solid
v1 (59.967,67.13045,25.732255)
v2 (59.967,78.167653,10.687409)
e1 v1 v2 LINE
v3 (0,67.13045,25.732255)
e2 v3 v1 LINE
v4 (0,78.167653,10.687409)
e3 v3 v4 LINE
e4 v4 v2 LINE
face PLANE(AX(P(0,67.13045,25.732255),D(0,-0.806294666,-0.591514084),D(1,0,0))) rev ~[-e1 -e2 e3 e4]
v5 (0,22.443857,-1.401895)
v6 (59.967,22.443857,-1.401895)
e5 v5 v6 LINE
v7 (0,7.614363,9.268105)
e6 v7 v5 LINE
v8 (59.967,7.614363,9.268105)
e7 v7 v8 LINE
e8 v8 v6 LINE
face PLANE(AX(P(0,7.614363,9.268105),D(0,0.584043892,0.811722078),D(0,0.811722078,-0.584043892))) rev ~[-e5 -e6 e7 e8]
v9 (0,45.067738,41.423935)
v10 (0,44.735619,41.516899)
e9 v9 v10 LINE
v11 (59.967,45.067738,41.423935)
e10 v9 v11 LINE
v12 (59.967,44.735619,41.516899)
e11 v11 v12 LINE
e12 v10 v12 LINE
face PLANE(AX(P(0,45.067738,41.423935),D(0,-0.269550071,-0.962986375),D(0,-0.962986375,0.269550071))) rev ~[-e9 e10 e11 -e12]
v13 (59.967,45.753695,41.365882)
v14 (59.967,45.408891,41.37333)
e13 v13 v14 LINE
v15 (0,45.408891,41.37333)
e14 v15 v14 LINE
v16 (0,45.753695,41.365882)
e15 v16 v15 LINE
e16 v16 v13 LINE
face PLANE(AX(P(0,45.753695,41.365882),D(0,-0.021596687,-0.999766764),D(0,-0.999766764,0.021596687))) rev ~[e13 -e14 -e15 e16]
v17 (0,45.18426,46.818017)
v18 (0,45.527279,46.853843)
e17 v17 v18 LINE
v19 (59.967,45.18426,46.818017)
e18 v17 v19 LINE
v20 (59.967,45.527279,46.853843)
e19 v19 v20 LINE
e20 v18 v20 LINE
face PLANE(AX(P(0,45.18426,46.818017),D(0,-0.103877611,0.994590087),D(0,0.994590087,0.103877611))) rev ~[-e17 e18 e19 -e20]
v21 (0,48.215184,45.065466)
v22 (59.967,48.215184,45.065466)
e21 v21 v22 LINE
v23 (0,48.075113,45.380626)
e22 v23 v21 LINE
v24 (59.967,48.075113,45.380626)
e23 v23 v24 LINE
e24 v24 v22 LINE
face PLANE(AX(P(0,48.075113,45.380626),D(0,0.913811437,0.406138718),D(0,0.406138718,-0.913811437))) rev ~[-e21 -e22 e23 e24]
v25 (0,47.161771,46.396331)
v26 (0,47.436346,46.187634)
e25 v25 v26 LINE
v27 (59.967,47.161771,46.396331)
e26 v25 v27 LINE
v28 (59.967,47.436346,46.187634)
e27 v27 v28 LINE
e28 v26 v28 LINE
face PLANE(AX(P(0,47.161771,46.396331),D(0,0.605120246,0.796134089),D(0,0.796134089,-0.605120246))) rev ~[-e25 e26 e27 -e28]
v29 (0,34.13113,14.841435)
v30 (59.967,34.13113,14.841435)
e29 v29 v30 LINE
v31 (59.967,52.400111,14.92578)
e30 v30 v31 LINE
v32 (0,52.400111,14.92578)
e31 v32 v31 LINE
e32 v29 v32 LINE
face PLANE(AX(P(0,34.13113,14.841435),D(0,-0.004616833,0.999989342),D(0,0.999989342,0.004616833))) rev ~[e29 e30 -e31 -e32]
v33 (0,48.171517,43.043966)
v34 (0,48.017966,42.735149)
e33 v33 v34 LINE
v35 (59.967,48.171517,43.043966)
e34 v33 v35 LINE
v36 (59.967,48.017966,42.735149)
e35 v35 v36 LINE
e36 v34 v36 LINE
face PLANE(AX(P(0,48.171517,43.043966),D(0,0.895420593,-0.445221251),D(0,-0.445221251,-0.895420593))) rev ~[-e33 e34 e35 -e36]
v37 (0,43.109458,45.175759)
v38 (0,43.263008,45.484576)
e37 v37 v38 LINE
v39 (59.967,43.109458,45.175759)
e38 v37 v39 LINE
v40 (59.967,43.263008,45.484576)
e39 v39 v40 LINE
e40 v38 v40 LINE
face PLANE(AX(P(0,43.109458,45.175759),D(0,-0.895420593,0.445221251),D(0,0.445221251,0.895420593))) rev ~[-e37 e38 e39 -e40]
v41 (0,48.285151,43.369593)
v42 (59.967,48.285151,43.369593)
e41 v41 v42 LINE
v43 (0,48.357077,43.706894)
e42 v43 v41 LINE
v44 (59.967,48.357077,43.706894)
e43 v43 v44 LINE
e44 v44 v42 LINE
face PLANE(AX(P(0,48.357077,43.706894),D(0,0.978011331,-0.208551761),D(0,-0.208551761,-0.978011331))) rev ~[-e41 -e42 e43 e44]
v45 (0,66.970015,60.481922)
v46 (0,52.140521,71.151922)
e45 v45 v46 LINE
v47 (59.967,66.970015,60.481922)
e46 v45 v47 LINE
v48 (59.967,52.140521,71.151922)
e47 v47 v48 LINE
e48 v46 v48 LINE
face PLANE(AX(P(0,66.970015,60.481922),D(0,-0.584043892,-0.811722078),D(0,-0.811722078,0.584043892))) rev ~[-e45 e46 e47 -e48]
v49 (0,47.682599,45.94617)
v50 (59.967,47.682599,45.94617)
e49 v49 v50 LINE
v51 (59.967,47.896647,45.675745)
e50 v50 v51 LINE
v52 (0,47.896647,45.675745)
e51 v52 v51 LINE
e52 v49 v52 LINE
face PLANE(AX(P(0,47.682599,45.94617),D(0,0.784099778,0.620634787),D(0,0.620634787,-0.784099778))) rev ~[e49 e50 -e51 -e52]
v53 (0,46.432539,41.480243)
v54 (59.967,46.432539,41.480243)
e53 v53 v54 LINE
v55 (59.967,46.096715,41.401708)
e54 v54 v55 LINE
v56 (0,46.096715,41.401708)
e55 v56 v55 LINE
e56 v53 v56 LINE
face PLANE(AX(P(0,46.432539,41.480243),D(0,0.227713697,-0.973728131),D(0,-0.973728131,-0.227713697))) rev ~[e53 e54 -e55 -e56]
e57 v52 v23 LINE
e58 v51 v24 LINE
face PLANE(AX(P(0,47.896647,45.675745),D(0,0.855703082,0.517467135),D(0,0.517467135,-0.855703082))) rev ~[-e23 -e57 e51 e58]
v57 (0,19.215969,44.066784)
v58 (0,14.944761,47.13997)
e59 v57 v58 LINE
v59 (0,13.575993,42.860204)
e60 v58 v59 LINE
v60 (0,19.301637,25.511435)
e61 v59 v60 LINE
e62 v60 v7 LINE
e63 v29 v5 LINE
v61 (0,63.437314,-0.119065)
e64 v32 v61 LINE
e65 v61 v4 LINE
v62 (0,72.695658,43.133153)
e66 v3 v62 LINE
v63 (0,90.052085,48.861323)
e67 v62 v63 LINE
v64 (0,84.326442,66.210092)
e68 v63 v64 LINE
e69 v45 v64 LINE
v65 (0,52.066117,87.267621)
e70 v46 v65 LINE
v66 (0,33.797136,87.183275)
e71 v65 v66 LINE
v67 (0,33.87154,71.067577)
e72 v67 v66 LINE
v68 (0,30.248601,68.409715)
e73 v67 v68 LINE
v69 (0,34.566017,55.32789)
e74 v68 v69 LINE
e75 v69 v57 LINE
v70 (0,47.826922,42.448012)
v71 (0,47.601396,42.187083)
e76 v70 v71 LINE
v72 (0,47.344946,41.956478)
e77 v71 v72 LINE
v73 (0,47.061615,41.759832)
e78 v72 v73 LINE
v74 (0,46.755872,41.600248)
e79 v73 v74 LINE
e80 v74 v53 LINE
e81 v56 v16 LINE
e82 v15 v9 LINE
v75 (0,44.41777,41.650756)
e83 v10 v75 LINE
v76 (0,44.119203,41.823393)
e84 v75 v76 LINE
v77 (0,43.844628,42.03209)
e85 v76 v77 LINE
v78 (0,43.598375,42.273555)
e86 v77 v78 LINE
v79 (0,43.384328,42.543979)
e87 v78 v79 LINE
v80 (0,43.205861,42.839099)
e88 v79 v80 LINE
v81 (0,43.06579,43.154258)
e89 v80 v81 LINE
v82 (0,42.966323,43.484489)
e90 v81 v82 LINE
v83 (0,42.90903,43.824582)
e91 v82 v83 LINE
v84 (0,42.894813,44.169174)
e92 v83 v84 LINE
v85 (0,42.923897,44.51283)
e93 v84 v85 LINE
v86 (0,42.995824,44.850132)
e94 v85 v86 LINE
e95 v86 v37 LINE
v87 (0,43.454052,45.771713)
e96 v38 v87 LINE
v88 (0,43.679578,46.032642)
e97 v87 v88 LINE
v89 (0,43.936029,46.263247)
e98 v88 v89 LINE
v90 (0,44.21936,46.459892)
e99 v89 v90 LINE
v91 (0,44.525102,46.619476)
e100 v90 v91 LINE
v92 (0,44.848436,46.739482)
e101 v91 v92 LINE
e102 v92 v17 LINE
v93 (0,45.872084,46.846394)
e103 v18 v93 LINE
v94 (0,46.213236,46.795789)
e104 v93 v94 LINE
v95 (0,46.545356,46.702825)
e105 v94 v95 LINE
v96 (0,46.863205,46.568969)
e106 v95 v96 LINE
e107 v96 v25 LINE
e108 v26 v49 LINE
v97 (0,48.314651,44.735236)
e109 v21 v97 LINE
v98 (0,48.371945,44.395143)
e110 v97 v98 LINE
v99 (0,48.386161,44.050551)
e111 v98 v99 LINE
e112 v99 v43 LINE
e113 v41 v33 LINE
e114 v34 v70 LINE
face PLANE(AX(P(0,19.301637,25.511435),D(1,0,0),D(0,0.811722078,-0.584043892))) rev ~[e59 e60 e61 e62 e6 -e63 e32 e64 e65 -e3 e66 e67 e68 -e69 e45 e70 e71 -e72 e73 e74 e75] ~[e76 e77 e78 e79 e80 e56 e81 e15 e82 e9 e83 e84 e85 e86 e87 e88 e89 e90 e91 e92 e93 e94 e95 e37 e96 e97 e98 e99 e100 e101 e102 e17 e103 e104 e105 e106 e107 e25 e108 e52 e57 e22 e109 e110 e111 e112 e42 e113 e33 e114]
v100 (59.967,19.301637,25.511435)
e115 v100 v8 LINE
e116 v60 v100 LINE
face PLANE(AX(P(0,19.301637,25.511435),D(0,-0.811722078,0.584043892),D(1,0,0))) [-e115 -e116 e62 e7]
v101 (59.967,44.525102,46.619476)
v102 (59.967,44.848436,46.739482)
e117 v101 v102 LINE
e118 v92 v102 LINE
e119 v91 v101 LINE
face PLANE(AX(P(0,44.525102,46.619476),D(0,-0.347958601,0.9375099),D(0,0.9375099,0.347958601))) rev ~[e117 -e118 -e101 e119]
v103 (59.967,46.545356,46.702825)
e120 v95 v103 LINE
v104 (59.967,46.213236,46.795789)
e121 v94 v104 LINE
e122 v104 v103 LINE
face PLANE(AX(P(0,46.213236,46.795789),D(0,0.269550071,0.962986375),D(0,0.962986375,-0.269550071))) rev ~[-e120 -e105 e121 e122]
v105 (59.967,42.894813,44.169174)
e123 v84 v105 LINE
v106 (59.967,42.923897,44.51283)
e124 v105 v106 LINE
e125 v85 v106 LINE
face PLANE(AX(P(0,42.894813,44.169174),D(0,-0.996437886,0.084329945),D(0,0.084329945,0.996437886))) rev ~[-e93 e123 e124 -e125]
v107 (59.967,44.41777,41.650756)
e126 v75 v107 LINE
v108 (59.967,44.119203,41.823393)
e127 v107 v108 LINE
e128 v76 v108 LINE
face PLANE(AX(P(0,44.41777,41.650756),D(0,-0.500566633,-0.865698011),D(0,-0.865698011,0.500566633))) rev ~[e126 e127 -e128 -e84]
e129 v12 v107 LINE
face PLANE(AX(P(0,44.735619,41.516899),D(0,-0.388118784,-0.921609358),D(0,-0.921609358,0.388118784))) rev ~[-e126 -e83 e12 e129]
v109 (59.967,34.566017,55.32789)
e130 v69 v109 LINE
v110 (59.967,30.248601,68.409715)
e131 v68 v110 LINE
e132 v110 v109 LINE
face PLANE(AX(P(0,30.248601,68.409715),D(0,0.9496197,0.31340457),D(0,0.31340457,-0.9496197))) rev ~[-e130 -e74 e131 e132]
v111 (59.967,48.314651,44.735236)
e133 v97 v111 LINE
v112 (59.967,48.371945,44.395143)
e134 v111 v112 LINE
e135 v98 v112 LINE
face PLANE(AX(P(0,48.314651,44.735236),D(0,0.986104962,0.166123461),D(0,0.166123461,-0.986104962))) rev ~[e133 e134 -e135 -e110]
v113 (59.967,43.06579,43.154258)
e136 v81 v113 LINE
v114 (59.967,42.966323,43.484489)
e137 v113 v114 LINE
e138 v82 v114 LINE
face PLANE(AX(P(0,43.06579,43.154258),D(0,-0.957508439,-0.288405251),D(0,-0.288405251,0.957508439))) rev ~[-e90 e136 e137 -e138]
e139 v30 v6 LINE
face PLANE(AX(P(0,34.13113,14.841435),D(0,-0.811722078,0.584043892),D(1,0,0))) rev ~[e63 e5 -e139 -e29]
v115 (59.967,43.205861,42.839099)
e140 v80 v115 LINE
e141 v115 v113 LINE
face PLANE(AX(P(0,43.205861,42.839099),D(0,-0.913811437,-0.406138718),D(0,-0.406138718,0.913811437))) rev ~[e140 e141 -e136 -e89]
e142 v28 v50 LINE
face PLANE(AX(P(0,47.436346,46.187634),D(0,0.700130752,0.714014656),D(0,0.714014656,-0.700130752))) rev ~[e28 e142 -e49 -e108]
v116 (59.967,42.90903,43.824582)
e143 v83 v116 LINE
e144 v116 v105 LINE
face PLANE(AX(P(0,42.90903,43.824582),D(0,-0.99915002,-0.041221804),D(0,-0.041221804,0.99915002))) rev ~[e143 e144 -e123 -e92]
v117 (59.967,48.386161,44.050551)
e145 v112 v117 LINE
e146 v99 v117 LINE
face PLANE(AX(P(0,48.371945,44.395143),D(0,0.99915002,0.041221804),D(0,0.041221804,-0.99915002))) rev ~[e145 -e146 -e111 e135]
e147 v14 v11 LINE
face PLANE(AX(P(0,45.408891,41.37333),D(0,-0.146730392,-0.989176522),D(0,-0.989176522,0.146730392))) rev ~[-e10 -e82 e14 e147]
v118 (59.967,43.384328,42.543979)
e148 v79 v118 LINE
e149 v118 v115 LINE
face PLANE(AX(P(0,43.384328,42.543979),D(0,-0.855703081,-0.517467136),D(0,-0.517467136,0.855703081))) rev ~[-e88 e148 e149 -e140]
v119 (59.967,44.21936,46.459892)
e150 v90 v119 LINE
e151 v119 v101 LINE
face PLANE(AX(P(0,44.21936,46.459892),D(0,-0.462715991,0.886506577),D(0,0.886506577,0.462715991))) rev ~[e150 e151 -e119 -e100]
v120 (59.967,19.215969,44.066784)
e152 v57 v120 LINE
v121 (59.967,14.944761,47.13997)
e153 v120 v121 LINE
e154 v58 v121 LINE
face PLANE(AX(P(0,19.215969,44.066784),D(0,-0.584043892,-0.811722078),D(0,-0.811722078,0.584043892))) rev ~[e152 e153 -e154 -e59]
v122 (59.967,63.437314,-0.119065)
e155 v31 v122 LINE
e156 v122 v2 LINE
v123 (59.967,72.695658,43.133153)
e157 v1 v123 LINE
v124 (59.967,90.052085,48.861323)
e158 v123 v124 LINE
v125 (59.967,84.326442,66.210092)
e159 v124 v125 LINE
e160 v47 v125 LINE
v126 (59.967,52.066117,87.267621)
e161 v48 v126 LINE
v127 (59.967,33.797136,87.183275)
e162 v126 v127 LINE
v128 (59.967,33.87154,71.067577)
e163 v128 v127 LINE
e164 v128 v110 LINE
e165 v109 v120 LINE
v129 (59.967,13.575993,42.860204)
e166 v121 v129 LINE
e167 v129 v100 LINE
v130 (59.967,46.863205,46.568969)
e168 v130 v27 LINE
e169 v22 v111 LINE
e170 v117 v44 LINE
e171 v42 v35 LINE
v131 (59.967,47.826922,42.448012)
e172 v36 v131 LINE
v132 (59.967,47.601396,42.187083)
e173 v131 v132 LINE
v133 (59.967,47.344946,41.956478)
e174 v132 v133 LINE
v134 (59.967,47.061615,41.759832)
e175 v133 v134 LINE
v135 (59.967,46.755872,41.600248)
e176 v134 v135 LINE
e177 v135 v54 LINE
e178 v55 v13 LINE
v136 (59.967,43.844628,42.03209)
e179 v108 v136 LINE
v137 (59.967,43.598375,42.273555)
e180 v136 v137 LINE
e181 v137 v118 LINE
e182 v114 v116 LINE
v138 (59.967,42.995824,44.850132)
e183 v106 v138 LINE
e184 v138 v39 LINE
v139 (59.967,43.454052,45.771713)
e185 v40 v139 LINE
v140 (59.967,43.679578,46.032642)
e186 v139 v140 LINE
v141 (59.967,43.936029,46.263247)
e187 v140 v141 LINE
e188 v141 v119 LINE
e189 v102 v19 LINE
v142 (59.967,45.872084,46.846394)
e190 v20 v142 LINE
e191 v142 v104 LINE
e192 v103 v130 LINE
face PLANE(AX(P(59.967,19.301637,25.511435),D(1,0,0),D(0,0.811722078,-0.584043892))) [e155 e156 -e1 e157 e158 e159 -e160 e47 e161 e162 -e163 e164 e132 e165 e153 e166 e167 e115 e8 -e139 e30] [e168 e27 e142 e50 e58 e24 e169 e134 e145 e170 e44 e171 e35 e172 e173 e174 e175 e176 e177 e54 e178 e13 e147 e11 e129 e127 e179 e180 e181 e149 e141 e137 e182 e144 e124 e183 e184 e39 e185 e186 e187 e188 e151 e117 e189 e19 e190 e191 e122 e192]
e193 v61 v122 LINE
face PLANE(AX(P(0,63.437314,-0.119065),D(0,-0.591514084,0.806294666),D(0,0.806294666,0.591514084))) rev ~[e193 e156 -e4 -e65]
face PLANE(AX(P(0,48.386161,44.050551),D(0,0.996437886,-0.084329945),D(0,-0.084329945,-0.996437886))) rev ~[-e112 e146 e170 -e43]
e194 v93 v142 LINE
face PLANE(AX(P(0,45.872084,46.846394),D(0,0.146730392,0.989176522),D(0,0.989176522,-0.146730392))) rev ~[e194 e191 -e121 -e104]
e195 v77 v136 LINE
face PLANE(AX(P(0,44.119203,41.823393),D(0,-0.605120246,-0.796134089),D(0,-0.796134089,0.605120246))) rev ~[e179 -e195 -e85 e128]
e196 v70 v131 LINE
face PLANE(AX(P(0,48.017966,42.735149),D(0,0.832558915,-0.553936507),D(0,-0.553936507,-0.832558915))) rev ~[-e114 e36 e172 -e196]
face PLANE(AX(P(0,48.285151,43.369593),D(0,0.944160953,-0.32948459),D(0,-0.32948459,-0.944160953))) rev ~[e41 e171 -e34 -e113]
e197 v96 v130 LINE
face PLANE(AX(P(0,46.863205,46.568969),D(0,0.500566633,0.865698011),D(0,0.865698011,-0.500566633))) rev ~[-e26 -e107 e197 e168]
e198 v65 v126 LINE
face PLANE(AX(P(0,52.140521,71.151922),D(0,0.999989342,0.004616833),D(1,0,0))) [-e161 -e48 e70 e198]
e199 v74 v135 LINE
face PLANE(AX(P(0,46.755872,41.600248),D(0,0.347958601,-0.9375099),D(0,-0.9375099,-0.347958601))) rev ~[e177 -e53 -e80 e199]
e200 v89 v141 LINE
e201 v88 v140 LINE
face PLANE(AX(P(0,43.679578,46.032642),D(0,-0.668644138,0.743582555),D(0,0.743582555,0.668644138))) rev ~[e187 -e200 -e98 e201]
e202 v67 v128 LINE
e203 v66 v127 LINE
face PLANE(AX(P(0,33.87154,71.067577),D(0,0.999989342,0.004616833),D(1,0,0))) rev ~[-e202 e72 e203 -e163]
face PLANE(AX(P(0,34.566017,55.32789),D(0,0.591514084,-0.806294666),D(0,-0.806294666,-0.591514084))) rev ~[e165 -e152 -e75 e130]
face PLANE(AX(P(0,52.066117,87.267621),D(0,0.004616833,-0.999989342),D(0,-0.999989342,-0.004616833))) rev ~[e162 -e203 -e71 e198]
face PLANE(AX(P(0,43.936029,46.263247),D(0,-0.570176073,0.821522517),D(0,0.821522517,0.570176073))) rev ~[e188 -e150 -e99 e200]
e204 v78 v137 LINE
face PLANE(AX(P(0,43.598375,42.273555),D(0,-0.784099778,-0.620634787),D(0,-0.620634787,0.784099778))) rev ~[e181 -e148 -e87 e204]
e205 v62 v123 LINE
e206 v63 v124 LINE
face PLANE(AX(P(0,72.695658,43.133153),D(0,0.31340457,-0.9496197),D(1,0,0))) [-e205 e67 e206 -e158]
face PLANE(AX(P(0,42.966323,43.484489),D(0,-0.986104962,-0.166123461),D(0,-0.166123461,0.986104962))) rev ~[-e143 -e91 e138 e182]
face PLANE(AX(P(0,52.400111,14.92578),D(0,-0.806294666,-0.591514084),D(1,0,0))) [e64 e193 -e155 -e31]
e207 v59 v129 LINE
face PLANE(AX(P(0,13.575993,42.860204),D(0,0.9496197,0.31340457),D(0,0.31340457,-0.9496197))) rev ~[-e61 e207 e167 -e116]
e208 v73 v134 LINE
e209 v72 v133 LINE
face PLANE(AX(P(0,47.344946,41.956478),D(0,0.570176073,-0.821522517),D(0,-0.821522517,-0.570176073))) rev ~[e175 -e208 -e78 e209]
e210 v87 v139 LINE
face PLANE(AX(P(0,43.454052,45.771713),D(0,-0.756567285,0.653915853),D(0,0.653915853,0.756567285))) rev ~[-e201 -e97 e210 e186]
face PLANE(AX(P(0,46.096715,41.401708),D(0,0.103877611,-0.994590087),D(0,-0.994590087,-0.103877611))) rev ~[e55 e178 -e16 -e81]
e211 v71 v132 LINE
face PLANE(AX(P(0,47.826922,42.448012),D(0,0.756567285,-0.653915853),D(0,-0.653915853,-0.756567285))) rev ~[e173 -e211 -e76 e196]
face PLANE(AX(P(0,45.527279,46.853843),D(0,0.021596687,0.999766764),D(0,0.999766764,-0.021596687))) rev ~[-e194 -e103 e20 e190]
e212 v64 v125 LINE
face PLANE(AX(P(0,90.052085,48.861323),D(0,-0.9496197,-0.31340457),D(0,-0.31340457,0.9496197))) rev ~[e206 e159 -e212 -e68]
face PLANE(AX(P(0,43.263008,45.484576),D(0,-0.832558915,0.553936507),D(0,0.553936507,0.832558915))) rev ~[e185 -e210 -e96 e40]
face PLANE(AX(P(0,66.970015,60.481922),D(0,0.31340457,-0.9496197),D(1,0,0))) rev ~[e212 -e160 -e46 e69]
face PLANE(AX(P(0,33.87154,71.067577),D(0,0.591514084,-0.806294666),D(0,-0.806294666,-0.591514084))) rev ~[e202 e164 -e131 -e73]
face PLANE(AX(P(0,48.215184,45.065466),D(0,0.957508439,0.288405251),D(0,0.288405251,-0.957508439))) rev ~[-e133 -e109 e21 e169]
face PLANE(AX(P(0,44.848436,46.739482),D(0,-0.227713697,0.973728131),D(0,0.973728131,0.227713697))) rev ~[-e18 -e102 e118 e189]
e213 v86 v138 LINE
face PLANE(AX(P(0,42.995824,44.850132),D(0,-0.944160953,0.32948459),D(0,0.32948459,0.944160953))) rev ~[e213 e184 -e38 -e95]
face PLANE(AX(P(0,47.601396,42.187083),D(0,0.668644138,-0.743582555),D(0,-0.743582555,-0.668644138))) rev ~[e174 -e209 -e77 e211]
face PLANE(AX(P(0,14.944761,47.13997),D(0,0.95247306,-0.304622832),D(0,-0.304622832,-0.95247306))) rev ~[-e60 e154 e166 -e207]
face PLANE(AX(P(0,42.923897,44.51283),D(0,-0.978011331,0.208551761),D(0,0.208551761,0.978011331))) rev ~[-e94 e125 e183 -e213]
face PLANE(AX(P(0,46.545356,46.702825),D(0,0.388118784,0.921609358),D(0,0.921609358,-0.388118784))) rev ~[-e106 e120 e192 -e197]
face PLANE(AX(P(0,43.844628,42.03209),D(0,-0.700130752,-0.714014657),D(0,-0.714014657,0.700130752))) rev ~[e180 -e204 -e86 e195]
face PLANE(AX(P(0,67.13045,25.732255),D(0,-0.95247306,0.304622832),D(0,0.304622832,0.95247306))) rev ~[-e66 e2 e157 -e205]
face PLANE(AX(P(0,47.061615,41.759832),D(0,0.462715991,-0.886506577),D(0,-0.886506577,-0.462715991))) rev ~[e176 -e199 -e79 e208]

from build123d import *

# Parameters (mm, degrees)
F1_DEPTH = 59.967
F2_DEPTH = 16.11587
F3_DEPTH = 18.27724
F4_DEPTH = 18.65924
F5_DEPTH = 20.01095


with BuildPart() as f1:
    # F0 (on Right) → F1 (new body)
    with BuildSketch(Plane.YZ):
        Polygon((19.3016365517, 25.5114351168), (34.1311297964, 14.8414346621), (52.4001107586, 14.9257803925), (67.1304496505, 25.7322551057), (72.6956576812, 43.1331527599), (66.9700145375, 60.481921886), (52.1405212928, 71.1519223406), (33.8715403306, 71.0675766103), (30.248601096, 68.4097150693), (34.5660174948, 55.3278902953), (19.2159686951, 44.0667838525), (14.944761002, 47.1399696503), (13.575993408, 42.8602042428), align=None)
        Polygon((43.3843278169, 42.5439793365), (43.2058611327, 42.8390985452), (43.0657899565, 43.1542584575), (42.9663232941, 43.4844888132), (42.9090297944, 43.8245816823), (42.8948130101, 44.1691735971), (42.9238971483, 44.5128301373), (42.9958235348, 44.850131634), (43.1094578475, 45.175758641), (43.2630080055, 45.484575826), (43.454052431, 45.7717129574), (43.6795782392, 46.0326417111), (43.9360287536, 46.2632470849), (44.2193595962, 46.4598922942), (44.5251024704, 46.6194761267), (44.8484356285, 46.7394818499), (45.1842599134, 46.8180169019), (45.5272791756, 46.853842738), (45.8720837963, 46.8463943634), (46.2132360006, 46.7957892434), (46.5453556147, 46.7028254509), (46.8632049136, 46.5689690806), (47.1617712242, 46.3963311273), (47.4363459773, 46.1876341948), (47.6825989651, 45.9461695581), (47.8966466309, 45.6757452591), (48.075113315, 45.3806260503), (48.2151844913, 45.065466138), (48.3146511536, 44.7352357824), (48.3719446533, 44.3951429133), (48.3861614376, 44.0505509984), (48.3570772994, 43.7068944582), (48.2851509129, 43.3695929615), (48.1715166002, 43.0439659545), (48.0179664422, 42.7351487696), (47.8269220168, 42.4480116382), (47.6013962085, 42.1870828844), (47.3449456942, 41.9564775106), (47.0616148515, 41.7598323013), (46.7558719773, 41.6002484689), (46.4325388192, 41.4802427457), (46.0967145343, 41.4017076937), (45.7536952721, 41.3658818576), (45.4088906515, 41.3733302322), (45.0677384471, 41.4239353522), (44.7356188331, 41.5168991446), (44.4177695341, 41.6507555149), (44.1192032235, 41.8233934682), (43.8446284704, 42.0320904008), (43.5983754826, 42.2735550374), align=None, mode=Mode.SUBTRACT)
    extrude(amount=F1_DEPTH)

    # F2 (add): a face of the model
    f2_faces = [f1.faces().sort_by_distance(p)[0] for p in [
        (29.9835, 43.0060308117, 71.1097494755),
    ]]
    extrude(f2_faces, amount=F2_DEPTH)

    # F3 (add): a face of the model
    f3_faces = [f1.faces().sort_by_distance(p)[0] for p in [
        (29.9835, 69.8328361093, 51.8075373229),
    ]]
    extrude(f3_faces, amount=F3_DEPTH)

    # F4 (add): a face of the model
    f4_faces = [f1.faces().sort_by_distance(p)[0] for p in [
        (29.9835, 59.7652802045, 20.3290177491),
    ]]
    extrude(f4_faces, amount=F4_DEPTH)

    # F5 (add): a face of the model
    f5_faces = [f1.faces().sort_by_distance(p)[0] for p in [
        (29.9835, 26.7163831741, 20.1764348894),
    ]]
    extrude(f5_faces, amount=F5_DEPTH)


solid = f1.part
